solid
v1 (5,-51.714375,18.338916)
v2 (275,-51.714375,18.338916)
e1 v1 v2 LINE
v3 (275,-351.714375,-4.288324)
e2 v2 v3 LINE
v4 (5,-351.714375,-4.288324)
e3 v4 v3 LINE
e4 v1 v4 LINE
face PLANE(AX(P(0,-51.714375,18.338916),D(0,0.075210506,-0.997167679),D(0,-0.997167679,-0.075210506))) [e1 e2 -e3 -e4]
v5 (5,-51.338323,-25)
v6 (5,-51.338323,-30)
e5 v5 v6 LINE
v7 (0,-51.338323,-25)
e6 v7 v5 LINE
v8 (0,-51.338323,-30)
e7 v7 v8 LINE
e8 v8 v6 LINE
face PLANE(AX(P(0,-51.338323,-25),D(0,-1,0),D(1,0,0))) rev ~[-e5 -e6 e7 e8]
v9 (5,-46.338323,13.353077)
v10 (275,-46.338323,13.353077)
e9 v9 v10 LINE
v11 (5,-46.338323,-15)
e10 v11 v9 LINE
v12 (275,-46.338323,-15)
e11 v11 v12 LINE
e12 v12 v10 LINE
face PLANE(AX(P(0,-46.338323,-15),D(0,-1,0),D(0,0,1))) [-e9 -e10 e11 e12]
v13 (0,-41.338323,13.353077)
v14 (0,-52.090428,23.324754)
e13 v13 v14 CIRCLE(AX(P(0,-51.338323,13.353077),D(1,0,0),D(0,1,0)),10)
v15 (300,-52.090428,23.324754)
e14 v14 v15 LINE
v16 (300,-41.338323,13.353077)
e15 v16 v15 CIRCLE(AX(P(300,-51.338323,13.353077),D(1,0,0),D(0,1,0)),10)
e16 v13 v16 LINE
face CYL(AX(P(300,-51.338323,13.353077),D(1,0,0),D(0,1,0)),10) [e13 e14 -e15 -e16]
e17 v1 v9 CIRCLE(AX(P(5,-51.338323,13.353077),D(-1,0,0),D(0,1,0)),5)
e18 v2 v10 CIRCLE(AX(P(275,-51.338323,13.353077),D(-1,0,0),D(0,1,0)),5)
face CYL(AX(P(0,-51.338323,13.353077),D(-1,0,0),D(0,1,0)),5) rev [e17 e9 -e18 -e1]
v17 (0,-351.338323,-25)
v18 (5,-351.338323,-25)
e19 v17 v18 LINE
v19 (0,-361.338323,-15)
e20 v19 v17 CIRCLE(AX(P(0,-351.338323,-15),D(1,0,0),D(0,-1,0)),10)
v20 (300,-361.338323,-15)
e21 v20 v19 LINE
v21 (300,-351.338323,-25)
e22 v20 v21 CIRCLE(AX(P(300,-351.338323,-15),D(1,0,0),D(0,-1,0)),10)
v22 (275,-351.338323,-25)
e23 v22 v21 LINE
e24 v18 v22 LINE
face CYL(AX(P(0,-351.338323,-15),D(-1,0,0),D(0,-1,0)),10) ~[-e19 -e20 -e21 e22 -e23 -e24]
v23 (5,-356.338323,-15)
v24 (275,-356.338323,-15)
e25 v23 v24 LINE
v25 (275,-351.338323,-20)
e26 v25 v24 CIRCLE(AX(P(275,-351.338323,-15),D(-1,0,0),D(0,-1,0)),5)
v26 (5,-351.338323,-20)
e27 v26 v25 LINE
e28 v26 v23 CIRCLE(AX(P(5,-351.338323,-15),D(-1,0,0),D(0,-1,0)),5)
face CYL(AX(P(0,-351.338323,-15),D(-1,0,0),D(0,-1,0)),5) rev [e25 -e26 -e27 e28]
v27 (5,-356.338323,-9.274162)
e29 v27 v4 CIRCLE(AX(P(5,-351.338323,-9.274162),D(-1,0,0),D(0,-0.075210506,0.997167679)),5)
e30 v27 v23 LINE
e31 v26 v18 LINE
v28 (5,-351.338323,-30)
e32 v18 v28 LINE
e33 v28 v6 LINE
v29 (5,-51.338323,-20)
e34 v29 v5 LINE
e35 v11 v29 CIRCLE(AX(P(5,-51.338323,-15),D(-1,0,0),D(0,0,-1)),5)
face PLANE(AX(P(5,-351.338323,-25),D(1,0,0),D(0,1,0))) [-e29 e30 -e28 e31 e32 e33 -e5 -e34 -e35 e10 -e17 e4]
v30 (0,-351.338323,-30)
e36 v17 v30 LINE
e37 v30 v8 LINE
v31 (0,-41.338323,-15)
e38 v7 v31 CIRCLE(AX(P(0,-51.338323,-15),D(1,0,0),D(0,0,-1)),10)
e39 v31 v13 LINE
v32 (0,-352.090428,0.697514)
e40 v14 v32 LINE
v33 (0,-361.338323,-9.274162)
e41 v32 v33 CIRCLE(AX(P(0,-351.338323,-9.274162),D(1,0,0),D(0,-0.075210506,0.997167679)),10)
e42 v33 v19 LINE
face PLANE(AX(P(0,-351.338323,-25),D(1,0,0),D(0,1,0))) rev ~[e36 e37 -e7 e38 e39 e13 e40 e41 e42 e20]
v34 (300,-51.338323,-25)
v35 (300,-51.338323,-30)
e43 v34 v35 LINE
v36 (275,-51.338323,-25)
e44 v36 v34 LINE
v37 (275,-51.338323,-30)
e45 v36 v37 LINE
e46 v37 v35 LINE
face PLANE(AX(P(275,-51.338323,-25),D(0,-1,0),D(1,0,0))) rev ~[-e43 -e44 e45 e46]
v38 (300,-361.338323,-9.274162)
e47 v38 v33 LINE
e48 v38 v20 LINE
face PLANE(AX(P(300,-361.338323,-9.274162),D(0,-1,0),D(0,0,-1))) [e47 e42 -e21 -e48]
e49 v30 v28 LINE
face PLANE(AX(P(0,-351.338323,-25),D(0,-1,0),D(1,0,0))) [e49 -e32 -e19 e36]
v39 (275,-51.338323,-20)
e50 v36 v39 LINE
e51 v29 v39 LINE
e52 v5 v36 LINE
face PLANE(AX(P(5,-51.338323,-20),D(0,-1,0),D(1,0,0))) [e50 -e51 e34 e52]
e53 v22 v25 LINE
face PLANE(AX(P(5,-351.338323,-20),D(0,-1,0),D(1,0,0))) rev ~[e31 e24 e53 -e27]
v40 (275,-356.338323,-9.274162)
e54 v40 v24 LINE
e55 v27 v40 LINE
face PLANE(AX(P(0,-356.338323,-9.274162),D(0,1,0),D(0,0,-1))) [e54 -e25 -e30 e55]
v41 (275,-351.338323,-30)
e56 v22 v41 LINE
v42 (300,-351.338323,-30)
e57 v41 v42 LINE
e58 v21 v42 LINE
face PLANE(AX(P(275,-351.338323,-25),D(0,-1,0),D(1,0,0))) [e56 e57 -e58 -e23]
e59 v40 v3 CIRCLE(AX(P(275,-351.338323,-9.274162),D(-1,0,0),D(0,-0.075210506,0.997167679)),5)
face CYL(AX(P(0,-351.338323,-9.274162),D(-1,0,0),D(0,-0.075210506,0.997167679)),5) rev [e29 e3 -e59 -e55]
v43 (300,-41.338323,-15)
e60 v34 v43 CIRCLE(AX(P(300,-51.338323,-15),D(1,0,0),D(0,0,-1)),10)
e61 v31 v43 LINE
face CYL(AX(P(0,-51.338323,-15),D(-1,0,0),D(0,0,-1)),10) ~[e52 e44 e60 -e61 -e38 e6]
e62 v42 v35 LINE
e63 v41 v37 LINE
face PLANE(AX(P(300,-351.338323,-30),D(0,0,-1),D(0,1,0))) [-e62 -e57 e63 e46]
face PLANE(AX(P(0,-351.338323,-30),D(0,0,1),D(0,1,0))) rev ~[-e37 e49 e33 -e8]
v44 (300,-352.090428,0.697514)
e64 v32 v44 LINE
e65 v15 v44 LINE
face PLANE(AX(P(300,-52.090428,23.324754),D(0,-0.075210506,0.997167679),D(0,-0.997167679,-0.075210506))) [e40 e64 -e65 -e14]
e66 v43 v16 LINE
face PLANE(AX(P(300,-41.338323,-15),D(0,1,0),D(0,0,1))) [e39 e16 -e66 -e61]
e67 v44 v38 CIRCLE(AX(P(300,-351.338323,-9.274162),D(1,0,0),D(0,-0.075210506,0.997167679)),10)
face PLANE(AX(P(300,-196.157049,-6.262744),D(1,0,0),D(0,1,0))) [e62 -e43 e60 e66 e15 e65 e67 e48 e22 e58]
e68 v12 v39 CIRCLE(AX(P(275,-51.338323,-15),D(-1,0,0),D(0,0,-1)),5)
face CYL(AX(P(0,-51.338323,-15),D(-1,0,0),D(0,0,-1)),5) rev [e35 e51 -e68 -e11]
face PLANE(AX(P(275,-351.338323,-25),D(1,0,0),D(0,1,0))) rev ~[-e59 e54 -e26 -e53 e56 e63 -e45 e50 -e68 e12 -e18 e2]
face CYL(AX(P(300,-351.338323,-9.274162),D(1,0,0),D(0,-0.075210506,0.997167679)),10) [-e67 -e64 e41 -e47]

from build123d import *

# Parameters (mm, degrees)
F1_DEPTH = 300
F2_T     = -5
F4_DEPTH = 25
F7_DEPTH = 5
F9_DEPTH = 300


# Not quite as in the source:
# - a feature of the source that left no trace in its solid (it failed there, or was rolled back) is left out
# - a feature names something its author has since deleted; it is built from what else it names


with BuildPart() as f1:
    # F0 (on Right) → F1 (new body)
    with BuildSketch(Plane.YZ):
        with BuildLine():
            ThreePointArc((-361.3383226016, -15), (-358.4093904135, -22.0710678119), (-351.3383226016, -25))
            Line((-351.3383226016, -25), (-51.3383226016, -25))
            ThreePointArc((-51.3383226016, -25), (-44.2672547897, -22.0710678119), (-41.3383226016, -15))
            Line((-41.3383226016, -15), (-41.3383226016, 13.3530771738))
            ThreePointArc((-41.3383226016, 13.3530771738), (-44.538361228, 20.6852341086), (-52.0904276652, 23.3247539622))
            Line((-52.0904276652, 23.3247539622), (-352.0904276652, 0.6975144458))
            ThreePointArc((-352.0904276652, 0.6975144458), (-358.6704795365, -2.474200969), (-361.3383226016, -9.2741623426))
            Line((-361.3383226016, -9.2741623426), (-361.3383226016, -15))
        make_face()
    extrude(amount=F1_DEPTH)

    # F2: a shell. OpenCascade refuses it in one call, so the cavity is built on its own and cut out:
    # the body offset inwards by the wall thickness, plus a prism from it out through each open face.
    f2_core = offset(f1.part, amount=F2_T, mode=Mode.PRIVATE)
    f2_exits = [f2_core.faces().sort_by_distance(p)[0] for p in [
        (150, -201.338323, -20),
    ]]
    add(f2_core, mode=Mode.SUBTRACT)
    extrude(f2_exits, amount=-F2_T, mode=Mode.SUBTRACT)

    # F4 (add): a face of the model
    f4_faces = [f1.faces().sort_by_distance(p)[0] for p in [
        (300, -183.9481701293, -5.8146709921),
    ]]
    extrude(f4_faces, amount=-F4_DEPTH)

    # F7 (add): faces of the model
    f7_faces = [f1.faces().sort_by_distance(p)[0] for p in [
        (2.5, -201.3383226016, -25),
        (287.5, -201.3383226016, -25),
    ]]
    extrude(f7_faces, amount=F7_DEPTH)

    # F0 (on Right) → F9 (cut)
    with BuildSketch(Plane.YZ):
        with BuildLine():
            ThreePointArc((-361.3383226016, -15), (-358.4093904135, -22.0710678119), (-351.3383226016, -25))
            Line((-351.3383226016, -25), (-51.3383226016, -25))
            ThreePointArc((-51.3383226016, -25), (-44.2672547897, -22.0710678119), (-41.3383226016, -15))
            Line((-41.3383226016, -15), (-41.3383226016, 13.3530771738))
            ThreePointArc((-41.3383226016, 13.3530771738), (-44.538361228, 20.6852341086), (-52.0904276652, 23.3247539622))
            Line((-52.0904276652, 23.3247539622), (-352.0904276652, 0.6975144458))
            ThreePointArc((-352.0904276652, 0.6975144458), (-358.6704795365, -2.474200969), (-361.3383226016, -9.2741623426))
            Line((-361.3383226016, -9.2741623426), (-361.3383226016, -15))
        make_face()
    extrude(amount=-F9_DEPTH, mode=Mode.SUBTRACT)


solid = f1.part
